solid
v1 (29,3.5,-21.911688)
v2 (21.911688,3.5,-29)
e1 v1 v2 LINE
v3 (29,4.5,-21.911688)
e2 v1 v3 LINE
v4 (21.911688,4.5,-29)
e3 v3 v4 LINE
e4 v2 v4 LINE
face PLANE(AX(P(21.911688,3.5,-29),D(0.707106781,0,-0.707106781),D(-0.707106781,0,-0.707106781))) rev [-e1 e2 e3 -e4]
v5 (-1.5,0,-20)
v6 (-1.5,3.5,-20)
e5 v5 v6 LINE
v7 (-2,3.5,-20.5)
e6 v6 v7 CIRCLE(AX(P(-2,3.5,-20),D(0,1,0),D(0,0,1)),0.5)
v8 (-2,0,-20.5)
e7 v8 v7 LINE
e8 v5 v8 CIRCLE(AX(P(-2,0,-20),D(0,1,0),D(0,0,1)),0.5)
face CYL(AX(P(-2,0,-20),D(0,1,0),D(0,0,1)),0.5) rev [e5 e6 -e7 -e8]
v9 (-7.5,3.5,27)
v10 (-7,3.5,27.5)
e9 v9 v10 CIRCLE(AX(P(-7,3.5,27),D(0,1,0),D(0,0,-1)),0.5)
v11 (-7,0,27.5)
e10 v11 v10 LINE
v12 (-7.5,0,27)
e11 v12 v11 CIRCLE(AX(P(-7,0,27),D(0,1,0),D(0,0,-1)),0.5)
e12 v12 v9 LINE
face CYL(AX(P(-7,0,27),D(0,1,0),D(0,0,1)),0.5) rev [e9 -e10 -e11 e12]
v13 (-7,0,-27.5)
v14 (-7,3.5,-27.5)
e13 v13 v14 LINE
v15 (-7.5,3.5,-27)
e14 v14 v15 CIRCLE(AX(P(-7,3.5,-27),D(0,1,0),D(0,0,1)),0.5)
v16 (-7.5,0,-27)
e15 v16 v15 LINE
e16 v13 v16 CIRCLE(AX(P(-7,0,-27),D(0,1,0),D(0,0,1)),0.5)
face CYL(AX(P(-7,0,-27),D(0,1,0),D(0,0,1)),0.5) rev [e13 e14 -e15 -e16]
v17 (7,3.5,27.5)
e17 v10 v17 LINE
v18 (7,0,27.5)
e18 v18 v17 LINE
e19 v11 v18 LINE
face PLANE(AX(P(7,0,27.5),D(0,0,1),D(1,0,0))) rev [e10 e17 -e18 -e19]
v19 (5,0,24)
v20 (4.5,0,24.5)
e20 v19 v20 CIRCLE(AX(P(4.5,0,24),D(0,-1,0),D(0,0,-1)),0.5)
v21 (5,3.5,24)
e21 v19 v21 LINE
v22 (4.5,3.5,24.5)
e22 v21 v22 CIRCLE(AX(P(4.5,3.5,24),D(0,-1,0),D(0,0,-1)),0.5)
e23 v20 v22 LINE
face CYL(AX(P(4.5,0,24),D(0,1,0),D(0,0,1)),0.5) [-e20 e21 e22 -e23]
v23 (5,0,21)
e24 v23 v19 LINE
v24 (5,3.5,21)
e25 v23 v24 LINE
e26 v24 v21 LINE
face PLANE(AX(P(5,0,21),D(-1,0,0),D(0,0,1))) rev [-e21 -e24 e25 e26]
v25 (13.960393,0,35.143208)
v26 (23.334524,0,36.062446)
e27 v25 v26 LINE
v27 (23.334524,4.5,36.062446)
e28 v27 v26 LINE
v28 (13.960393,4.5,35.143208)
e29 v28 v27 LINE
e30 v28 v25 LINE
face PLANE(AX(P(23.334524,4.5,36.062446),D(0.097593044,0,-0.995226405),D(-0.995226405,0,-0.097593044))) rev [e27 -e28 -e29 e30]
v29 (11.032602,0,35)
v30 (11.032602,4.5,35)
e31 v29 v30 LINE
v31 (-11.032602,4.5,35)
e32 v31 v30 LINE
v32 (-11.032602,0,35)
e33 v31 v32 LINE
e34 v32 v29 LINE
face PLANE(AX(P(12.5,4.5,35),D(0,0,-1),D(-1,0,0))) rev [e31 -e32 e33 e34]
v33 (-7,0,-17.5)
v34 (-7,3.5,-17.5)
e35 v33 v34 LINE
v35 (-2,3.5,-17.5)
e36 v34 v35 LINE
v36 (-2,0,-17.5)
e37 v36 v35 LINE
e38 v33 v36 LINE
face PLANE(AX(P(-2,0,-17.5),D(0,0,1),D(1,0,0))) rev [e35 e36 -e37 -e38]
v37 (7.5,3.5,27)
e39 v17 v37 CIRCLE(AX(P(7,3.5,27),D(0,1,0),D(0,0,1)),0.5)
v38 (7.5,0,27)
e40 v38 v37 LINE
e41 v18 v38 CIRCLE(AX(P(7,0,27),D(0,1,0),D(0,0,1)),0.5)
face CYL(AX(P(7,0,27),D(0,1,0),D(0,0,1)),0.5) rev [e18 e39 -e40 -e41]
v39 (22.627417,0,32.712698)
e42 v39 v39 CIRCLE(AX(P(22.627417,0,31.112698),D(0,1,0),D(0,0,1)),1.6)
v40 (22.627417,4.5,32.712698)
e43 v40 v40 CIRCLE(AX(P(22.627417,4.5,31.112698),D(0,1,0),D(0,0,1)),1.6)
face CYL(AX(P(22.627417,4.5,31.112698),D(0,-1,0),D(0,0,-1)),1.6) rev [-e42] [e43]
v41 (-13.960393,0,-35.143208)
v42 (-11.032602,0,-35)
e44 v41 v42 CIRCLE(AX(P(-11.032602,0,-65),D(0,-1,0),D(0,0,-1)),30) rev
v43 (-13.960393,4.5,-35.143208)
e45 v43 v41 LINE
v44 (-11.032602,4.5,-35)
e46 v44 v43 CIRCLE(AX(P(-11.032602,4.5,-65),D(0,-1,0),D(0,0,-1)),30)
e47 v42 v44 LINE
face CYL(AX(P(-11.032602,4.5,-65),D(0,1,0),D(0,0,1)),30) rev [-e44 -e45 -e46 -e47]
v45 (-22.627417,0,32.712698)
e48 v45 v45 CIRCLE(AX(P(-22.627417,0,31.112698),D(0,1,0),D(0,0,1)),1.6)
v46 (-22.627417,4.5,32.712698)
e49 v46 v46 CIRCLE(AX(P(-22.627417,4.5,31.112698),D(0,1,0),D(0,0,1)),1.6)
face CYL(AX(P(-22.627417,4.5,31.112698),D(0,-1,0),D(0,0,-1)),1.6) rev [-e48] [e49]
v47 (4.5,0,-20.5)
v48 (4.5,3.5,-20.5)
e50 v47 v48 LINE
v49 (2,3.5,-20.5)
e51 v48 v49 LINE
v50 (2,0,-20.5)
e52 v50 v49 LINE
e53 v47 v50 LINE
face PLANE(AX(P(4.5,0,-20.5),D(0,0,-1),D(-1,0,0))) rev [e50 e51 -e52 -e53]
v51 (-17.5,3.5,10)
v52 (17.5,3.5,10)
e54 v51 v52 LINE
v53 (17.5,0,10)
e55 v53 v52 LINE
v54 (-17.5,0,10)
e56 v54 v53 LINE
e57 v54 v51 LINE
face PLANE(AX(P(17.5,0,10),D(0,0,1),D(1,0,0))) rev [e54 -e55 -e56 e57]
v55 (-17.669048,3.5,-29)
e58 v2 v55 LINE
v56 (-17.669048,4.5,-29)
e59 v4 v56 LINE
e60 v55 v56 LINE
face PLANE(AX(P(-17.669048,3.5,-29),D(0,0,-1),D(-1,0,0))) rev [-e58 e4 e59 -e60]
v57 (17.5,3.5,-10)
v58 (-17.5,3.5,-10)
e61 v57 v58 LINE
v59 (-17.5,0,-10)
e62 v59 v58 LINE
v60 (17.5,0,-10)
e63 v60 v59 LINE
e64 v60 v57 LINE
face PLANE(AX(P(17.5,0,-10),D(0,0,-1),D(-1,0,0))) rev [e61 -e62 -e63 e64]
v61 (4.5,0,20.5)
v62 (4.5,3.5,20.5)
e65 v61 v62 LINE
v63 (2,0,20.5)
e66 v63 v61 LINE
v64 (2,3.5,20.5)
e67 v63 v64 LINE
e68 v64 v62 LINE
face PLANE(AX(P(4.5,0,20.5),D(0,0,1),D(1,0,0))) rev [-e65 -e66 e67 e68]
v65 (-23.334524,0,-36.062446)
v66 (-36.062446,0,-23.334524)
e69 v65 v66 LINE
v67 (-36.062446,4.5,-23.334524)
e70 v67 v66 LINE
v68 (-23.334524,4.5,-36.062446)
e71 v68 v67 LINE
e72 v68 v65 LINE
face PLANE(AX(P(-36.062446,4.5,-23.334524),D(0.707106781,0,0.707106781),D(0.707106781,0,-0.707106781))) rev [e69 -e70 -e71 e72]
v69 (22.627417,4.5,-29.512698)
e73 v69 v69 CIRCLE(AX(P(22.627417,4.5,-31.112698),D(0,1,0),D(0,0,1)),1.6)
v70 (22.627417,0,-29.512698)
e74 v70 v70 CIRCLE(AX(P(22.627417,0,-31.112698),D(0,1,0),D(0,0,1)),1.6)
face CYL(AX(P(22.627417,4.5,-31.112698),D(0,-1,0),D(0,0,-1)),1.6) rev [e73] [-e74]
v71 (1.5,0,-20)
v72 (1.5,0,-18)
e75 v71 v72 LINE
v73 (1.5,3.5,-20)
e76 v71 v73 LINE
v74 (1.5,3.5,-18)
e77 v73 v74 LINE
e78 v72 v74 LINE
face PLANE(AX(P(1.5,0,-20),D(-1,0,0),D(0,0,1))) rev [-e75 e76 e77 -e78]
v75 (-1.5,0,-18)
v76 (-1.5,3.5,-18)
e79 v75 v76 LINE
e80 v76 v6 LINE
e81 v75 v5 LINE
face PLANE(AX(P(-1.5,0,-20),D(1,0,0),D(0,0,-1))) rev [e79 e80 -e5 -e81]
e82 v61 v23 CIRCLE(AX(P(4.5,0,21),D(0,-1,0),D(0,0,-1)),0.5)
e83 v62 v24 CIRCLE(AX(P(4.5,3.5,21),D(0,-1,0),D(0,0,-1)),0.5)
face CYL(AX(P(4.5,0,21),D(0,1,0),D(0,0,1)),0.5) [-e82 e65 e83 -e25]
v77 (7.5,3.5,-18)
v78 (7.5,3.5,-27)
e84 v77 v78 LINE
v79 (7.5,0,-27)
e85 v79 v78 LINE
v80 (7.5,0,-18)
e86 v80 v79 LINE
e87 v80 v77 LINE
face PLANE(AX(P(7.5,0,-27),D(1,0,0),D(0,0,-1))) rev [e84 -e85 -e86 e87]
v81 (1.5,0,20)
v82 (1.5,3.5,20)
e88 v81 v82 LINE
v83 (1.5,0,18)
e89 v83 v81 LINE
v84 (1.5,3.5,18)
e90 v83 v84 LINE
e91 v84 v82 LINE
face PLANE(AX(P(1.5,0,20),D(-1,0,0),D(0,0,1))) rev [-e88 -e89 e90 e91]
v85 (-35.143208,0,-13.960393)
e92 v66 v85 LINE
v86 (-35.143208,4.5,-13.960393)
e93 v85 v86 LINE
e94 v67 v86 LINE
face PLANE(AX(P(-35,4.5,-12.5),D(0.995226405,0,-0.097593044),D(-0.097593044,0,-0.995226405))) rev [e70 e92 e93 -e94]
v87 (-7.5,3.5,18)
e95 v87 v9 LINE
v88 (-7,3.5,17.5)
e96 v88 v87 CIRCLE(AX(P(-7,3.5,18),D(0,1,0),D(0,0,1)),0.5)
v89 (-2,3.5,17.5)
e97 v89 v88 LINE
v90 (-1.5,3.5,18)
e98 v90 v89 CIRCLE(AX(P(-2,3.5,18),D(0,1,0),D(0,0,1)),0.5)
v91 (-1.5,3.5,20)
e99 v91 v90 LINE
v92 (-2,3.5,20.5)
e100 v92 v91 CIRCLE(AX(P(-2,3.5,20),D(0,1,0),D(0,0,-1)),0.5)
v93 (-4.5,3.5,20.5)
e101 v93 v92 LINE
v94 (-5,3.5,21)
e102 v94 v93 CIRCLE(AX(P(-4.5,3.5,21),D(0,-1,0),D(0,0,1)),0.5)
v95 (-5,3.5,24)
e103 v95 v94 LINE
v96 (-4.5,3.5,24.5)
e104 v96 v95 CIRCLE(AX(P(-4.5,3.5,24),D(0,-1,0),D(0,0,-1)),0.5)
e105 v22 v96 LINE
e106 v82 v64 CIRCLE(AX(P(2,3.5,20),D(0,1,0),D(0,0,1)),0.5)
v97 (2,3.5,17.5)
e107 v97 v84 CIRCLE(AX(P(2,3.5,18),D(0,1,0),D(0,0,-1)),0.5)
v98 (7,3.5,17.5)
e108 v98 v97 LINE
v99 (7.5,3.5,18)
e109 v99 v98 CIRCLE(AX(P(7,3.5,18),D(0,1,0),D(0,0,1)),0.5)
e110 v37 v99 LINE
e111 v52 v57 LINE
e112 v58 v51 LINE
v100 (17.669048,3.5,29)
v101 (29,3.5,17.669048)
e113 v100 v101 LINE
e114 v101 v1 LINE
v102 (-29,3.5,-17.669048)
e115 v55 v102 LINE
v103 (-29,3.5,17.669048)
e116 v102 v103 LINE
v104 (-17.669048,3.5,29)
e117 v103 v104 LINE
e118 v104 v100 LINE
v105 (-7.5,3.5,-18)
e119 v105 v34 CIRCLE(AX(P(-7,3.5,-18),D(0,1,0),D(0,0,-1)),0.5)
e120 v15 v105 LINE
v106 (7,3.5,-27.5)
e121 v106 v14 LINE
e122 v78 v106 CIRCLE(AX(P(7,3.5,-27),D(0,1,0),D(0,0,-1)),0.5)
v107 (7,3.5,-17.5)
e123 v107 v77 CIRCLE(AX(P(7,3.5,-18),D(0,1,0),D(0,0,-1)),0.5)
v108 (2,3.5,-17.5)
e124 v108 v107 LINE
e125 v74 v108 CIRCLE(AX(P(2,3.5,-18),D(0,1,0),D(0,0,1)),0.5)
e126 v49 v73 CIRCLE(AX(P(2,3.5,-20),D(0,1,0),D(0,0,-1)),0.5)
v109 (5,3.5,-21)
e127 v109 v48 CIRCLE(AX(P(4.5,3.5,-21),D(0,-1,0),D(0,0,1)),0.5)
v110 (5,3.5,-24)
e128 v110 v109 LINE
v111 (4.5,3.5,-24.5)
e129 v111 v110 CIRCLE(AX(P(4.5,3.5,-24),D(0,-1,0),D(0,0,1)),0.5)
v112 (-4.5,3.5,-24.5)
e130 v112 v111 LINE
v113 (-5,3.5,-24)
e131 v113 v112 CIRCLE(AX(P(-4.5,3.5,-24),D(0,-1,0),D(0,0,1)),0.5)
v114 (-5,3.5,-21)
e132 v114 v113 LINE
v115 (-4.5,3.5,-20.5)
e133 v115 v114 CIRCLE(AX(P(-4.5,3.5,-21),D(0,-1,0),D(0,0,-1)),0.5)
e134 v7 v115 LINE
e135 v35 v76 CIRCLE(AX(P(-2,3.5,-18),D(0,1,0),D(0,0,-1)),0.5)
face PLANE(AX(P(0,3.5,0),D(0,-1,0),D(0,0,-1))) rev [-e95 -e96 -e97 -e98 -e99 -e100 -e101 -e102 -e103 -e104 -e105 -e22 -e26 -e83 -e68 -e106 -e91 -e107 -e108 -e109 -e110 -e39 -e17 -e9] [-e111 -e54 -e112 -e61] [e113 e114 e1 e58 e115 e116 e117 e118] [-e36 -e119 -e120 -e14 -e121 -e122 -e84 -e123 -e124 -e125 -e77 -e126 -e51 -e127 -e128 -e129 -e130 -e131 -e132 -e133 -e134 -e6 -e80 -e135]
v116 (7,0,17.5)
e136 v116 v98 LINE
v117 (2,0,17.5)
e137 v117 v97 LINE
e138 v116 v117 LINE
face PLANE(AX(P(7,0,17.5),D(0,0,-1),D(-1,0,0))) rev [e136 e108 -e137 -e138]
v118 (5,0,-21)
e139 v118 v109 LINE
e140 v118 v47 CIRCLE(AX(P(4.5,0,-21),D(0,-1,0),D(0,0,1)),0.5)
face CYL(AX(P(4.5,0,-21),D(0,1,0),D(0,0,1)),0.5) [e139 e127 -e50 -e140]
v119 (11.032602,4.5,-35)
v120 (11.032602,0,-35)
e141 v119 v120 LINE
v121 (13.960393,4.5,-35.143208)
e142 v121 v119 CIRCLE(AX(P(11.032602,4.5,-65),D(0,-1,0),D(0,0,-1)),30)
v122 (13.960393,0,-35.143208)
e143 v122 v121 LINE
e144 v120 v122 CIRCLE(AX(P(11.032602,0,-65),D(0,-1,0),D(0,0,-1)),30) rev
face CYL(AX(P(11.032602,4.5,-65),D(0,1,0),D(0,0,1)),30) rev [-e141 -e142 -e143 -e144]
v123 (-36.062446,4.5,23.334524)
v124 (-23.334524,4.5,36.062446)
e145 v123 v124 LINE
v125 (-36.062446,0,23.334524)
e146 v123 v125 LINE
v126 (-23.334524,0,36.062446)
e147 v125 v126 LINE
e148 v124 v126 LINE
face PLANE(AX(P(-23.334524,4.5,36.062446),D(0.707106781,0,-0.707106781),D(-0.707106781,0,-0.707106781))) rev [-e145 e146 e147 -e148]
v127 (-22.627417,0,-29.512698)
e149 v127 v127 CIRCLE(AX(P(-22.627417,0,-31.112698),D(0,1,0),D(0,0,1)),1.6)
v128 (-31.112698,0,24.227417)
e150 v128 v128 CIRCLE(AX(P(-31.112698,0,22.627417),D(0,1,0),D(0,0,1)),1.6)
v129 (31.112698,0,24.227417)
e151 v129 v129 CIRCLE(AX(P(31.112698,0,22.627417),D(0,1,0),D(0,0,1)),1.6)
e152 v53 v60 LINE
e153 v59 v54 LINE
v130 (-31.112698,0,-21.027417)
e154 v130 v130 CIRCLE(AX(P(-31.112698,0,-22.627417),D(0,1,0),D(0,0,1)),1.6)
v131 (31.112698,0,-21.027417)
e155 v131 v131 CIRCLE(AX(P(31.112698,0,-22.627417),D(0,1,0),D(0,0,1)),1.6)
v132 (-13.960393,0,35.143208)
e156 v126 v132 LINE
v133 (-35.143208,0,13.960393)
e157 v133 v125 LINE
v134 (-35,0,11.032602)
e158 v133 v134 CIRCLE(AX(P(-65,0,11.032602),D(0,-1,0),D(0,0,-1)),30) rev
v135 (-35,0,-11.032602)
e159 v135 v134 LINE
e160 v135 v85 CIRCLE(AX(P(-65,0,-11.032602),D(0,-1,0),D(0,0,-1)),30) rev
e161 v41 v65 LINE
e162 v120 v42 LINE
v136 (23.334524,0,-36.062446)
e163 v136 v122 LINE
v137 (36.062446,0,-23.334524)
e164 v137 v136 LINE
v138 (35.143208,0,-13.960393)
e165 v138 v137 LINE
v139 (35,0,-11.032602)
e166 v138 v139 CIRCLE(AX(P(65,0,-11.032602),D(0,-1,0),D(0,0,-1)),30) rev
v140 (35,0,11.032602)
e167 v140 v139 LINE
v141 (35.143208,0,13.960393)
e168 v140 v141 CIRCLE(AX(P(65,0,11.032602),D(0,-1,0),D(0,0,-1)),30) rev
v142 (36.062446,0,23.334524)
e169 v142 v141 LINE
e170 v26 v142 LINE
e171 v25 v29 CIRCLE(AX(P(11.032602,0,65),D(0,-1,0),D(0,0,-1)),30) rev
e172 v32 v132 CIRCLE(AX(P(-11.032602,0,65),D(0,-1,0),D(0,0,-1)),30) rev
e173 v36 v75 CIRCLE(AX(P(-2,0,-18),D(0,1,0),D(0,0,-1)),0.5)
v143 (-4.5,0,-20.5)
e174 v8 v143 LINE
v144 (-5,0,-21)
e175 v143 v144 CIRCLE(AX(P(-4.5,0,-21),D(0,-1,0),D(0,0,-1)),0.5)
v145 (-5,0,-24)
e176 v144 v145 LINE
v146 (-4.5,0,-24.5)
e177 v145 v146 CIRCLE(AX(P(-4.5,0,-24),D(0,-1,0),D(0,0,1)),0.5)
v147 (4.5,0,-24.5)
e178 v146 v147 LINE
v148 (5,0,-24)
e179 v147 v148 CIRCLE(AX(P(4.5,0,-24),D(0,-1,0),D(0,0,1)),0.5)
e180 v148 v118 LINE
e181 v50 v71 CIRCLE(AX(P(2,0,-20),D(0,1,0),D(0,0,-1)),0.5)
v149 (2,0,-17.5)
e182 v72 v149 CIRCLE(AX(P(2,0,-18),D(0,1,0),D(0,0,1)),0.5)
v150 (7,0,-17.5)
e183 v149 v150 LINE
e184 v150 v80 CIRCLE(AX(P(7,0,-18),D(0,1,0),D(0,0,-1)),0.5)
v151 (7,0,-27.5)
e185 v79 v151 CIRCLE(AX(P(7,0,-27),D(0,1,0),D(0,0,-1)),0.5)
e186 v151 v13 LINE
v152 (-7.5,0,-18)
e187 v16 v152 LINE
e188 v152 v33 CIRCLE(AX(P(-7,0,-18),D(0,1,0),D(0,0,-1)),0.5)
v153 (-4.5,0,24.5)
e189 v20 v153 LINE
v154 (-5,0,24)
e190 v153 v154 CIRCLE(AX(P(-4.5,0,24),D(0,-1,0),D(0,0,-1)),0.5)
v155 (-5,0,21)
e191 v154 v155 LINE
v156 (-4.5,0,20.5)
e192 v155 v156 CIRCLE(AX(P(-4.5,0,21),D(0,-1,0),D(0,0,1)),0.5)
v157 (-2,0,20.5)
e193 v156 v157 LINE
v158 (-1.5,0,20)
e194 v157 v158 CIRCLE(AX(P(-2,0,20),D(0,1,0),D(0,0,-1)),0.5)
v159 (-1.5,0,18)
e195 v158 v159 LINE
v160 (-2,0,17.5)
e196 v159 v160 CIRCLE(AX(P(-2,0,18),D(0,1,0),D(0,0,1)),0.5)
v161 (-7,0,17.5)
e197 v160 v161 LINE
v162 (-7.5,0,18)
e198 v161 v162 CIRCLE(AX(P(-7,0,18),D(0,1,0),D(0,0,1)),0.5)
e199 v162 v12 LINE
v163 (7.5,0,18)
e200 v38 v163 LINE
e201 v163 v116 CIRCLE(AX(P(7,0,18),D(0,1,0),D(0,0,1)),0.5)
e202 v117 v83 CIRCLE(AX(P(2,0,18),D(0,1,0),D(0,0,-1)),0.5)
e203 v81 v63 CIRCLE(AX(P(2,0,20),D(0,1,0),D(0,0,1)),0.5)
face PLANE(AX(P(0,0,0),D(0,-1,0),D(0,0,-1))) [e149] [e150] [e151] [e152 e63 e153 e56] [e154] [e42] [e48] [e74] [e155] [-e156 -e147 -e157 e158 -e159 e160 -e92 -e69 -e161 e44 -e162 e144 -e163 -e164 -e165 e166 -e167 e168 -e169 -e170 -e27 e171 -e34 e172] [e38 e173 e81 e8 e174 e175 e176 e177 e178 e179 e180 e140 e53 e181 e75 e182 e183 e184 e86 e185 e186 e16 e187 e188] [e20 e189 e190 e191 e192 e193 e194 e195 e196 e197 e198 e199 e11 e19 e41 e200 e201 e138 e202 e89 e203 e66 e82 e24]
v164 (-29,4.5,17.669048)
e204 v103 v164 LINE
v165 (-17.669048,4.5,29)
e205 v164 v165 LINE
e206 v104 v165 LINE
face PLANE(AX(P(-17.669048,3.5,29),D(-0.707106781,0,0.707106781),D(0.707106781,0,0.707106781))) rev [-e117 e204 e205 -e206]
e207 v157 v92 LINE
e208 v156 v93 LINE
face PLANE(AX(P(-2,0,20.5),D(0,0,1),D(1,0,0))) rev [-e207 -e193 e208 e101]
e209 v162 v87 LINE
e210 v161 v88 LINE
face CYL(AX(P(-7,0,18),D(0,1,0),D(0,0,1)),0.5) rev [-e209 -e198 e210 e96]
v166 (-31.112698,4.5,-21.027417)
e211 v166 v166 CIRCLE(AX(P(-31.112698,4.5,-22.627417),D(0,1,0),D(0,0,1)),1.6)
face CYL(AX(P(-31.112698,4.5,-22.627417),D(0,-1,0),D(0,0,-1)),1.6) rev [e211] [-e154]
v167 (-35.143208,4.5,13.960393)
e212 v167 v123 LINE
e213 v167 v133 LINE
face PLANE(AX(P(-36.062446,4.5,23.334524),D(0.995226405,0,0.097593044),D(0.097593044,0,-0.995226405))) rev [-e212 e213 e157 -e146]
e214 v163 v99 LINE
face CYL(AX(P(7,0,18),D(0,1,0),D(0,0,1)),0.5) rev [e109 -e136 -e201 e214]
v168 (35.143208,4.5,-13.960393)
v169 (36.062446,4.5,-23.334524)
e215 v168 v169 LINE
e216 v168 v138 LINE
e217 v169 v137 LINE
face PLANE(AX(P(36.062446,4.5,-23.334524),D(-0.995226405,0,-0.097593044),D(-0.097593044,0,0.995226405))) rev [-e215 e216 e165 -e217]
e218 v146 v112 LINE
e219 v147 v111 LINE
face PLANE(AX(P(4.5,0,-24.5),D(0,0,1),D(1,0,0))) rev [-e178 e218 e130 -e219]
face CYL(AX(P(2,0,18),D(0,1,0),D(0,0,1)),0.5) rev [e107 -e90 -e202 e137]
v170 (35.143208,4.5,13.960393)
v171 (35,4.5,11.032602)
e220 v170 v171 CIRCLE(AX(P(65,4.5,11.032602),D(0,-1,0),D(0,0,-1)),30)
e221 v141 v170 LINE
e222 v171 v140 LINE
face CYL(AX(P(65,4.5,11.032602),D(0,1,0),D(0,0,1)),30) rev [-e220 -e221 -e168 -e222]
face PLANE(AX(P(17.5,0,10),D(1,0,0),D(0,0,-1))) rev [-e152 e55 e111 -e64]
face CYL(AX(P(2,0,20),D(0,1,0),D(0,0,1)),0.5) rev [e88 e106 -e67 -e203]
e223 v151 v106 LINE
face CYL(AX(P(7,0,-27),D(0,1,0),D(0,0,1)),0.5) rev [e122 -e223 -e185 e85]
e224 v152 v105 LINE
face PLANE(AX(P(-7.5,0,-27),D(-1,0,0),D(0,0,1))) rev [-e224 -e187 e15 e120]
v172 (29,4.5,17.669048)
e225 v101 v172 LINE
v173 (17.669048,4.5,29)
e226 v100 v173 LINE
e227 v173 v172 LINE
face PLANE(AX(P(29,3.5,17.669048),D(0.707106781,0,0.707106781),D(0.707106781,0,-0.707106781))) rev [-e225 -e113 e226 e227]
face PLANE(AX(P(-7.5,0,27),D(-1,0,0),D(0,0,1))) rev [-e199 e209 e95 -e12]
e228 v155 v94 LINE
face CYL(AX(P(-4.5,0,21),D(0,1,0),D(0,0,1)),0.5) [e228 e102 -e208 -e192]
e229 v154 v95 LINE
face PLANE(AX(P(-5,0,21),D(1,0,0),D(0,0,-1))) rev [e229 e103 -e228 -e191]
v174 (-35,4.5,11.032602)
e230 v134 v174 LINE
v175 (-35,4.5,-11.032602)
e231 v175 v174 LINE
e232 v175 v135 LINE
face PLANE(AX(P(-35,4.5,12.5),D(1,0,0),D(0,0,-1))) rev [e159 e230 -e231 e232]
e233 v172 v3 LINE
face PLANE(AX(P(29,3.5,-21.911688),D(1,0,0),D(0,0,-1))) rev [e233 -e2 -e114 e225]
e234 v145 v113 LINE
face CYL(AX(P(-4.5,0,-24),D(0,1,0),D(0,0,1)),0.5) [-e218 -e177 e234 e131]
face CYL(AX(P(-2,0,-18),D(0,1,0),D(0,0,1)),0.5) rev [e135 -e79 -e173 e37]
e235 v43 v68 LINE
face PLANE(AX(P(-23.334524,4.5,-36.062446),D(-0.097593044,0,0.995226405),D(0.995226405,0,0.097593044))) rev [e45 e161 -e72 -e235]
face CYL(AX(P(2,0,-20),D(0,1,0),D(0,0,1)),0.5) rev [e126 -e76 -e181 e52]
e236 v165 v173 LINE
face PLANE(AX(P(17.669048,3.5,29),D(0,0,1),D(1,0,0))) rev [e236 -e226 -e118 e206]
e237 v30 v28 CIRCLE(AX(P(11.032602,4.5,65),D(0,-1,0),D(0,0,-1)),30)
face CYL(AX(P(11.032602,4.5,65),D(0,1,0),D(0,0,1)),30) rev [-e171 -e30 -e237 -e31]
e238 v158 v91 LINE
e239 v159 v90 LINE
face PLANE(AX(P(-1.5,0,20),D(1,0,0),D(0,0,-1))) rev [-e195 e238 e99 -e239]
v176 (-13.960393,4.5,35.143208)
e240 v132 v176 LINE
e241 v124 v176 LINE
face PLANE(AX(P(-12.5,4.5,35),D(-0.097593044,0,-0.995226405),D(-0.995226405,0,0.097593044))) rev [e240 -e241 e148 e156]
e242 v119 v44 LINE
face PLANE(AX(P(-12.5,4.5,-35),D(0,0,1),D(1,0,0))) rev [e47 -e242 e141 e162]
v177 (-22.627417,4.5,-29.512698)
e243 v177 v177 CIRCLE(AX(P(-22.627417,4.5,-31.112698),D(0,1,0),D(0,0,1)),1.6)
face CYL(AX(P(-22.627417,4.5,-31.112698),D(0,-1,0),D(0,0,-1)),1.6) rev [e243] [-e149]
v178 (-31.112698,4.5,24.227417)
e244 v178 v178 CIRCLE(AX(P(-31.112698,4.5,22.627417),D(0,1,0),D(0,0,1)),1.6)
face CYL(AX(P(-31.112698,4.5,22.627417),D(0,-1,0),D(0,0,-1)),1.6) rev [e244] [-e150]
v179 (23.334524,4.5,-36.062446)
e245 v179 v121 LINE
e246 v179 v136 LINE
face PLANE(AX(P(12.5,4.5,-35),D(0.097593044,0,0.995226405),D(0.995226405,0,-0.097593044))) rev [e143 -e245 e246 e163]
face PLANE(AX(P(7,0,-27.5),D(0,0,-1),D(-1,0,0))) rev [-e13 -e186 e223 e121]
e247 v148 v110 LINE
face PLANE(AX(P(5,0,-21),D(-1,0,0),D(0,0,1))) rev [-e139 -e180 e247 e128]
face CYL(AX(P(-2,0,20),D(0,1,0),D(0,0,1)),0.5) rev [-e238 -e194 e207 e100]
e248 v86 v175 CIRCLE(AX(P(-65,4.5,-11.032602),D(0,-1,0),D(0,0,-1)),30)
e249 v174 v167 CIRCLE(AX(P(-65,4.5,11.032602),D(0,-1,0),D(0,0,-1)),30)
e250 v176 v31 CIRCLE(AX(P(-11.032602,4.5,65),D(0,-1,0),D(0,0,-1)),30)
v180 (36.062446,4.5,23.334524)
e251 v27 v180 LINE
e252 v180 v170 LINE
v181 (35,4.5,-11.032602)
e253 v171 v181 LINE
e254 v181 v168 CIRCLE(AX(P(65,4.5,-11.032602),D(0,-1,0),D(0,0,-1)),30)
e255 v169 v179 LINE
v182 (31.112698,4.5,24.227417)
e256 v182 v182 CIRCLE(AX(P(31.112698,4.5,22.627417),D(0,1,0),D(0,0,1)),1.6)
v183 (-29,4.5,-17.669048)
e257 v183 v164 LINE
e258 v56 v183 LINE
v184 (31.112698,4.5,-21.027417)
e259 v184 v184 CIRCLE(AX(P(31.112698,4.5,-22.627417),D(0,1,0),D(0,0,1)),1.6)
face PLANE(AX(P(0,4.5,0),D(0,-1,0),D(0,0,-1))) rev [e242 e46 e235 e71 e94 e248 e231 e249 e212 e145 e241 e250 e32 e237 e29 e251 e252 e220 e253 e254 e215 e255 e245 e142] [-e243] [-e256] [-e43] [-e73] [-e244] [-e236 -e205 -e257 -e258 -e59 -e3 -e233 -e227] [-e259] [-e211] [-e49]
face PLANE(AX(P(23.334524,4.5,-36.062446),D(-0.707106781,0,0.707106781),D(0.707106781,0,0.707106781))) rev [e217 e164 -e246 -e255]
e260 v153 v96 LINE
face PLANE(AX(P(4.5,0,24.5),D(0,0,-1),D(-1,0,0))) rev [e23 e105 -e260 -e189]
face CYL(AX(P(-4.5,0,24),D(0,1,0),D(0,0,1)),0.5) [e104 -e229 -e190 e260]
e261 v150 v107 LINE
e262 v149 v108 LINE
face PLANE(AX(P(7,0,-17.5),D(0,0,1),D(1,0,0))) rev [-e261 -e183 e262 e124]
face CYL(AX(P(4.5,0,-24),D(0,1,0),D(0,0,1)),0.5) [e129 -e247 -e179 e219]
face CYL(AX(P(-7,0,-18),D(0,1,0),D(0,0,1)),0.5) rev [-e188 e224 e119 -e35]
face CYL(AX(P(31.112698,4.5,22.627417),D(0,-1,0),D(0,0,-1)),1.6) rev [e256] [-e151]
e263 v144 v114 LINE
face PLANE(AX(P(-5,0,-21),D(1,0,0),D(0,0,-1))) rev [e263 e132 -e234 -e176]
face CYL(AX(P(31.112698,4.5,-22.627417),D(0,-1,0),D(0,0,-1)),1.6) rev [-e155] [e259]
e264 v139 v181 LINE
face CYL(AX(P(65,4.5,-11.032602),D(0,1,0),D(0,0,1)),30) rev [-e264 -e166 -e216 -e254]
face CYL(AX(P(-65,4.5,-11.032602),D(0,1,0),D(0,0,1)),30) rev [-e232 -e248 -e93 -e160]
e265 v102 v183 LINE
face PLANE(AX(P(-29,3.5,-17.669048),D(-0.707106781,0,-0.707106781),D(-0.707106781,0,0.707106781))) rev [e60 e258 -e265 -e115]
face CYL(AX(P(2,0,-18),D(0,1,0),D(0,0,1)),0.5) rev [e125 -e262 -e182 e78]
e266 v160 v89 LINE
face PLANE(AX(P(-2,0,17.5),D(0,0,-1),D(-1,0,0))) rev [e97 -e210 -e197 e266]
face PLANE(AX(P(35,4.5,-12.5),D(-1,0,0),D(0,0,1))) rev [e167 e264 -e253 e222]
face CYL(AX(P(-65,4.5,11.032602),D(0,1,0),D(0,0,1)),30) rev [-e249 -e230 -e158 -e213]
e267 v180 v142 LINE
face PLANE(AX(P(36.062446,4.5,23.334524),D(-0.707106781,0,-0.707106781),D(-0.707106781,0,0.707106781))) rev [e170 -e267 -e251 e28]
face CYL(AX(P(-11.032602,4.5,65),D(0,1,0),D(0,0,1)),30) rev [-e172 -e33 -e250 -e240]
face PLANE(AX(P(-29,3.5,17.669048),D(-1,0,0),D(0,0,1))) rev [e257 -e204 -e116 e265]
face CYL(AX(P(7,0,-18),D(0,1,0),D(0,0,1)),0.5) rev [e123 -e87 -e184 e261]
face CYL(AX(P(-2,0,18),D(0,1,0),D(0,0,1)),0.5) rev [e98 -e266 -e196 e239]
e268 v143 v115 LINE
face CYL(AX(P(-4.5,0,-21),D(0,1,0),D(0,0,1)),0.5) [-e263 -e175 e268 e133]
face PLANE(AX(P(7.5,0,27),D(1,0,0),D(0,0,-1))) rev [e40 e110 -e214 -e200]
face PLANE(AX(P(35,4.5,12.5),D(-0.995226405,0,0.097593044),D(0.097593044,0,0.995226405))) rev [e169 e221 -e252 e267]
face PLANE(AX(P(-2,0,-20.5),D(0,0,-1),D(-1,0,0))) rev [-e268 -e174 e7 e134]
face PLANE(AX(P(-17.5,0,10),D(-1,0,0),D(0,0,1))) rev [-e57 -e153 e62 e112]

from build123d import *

# Parameters (mm, degrees)
SKETCH2_R           = 1.6
BOSS_EXTRUDE1_DEPTH = 4.5
CUT_EXTRUDE1_DEPTH  = 1
FILLET2_R           = 30
CUT_EXTRUDE4_DEPTH  = 52.119956964
SKETCH11_W          = 35
SKETCH11_H          = 20
CUT_EXTRUDE5_DEPTH  = 52.119956964


with BuildPart() as part:
    # Sketch2 → Boss-Extrude1 (new body)
    with BuildSketch(Plane(origin=(0, 0, 0), x_dir=(1, 0, 0), z_dir=(0, 1, 0))):
        Polygon((-12.5, 35), (12.5, 35), (23.334523779, 36.062445841), (36.062445841, 23.334523779), (35, 12.5), (35, -12.5), (36.062445841, -23.334523779), (23.334523779, -36.062445841), (12.5, -35), (-12.5, -35), (-23.334523779, -36.062445841), (-36.062445841, -23.334523779), (-35, -12.5), (-35, 12.5), (-36.062445841, 23.334523779), (-23.334523779, 36.062445841), align=None)
        with Locations(Location((22.627416998, 31.112698372, 0), (0, 0, 270))):
            Circle(SKETCH2_R, mode=Mode.SUBTRACT)
        with Locations(Location((31.112698372, 22.627416998, 0), (0, 0, 270))):
            Circle(SKETCH2_R, mode=Mode.SUBTRACT)
        with Locations(Location((22.627416998, -31.112698372, 0), (0, 0, 270))):
            Circle(SKETCH2_R, mode=Mode.SUBTRACT)
        with Locations(Location((31.112698372, -22.627416998, 0), (0, 0, 270))):
            Circle(SKETCH2_R, mode=Mode.SUBTRACT)
        with Locations(Location((-31.112698372, -22.627416998, 0), (0, 0, 270))):
            Circle(SKETCH2_R, mode=Mode.SUBTRACT)
        with Locations(Location((-22.627416998, -31.112698372, 0), (0, 0, 270))):
            Circle(SKETCH2_R, mode=Mode.SUBTRACT)
        with Locations(Location((-22.627416998, 31.112698372, 0), (0, 0, 270))):
            Circle(SKETCH2_R, mode=Mode.SUBTRACT)
        with Locations(Location((-31.112698372, 22.627416998, 0), (0, 0, 270))):
            Circle(SKETCH2_R, mode=Mode.SUBTRACT)
    extrude(amount=BOSS_EXTRUDE1_DEPTH)

    # Sketch3 → Cut-Extrude1 (cut)
    with BuildSketch(Plane(origin=(0, 4.5, 0), x_dir=(1, 0, 0), z_dir=(0, 1, 0))):
        Polygon((-17.669047558, 29), (21.911688245, 29), (29, 21.911688245), (29, -17.669047558), (17.669047558, -29), (-17.669047558, -29), (-29, -17.669047558), (-29, 17.669047558), align=None)
    extrude(amount=-CUT_EXTRUDE1_DEPTH, mode=Mode.SUBTRACT)

    # Fillet2
    # the kernel refuses this fillet: 30 mm, written as the material it adds along each edge
    with BuildSketch(Plane(origin=(-12.5, 0, -35), x_dir=(1, 0, 0), z_dir=(0, 1, 0))) as fillet2_piece_1:
        with BuildLine():
            CenterArc((FILLET2_R * 0.0489132680018, FILLET2_R), FILLET2_R, 264.399415997, 5.600584003)
            Line((-FILLET2_R * 0.0486797758844, FILLET2_R * 0.00477359471072), (0, 0))
            Line((0, 0), (FILLET2_R * 0.0489132680018, 0))
        make_face()
    extrude(amount=4.5)
    with BuildSketch(Plane(origin=(12.5, 0, -35), x_dir=(-1, 0, 0), z_dir=(0, 1, 0)), Plane(origin=(35, 0, -12.5), x_dir=(0.09759304388620155, 0, -0.9952264052892819), z_dir=(0, 1, 0)), Plane(origin=(35, 0, 12.5), x_dir=(0, 0, -1), z_dir=(0, 1, 0)), Plane(origin=(12.5, 0, 35), x_dir=(0.9952264052892817, 0, 0.09759304388620309), z_dir=(0, 1, 0)), Plane(origin=(-12.5, 0, 35), x_dir=(1, 0, 0), z_dir=(0, 1, 0)), Plane(origin=(-35, 0, 12.5), x_dir=(-0.09759304388619769, 0, 0.9952264052892822), z_dir=(0, 1, 0)), Plane(origin=(-35, 0, -12.5), x_dir=(0, 0, 1), z_dir=(0, 1, 0))) as fillet2_piece_2:
        with BuildLine():
            CenterArc((FILLET2_R * 0.048913268002, -FILLET2_R), FILLET2_R, 90, 5.600584003)
            Line((-FILLET2_R * 0.0486797758846, -FILLET2_R * 0.00477359471075), (0, 0))
            Line((0, 0), (FILLET2_R * 0.048913268002, 0))
        make_face()
    extrude(amount=4.5)

    # Sketch10 → Cut-Extrude4 (cut, through all)
    with BuildSketch(Plane(origin=(0, 3.5, 0), x_dir=(1, 0, 0), z_dir=(0, 1, 0))):
        with BuildLine():
            Line((-1.5, 20), (-1.5, 18))
            ThreePointArc((-1.5, 18), (-1.646446609, 17.646446609), (-2, 17.5))
            Line((-2, 17.5), (-7, 17.5))
            ThreePointArc((-7, 17.5), (-7.353553391, 17.646446609), (-7.5, 18))
            Line((-7.5, 18), (-7.5, 27))
            ThreePointArc((-7.5, 27), (-7.353553391, 27.353553391), (-7, 27.5))
            Line((-7, 27.5), (7, 27.5))
            ThreePointArc((7, 27.5), (7.353553391, 27.353553391), (7.5, 27))
            Line((7.5, 27), (7.5, 18))
            ThreePointArc((7.5, 18), (7.353553391, 17.646446609), (7, 17.5))
            Line((7, 17.5), (2, 17.5))
            ThreePointArc((2, 17.5), (1.646446609, 17.646446609), (1.5, 18))
            Line((1.5, 18), (1.5, 20))
            ThreePointArc((1.5, 20), (1.646446609, 20.353553391), (2, 20.5))
            Line((2, 20.5), (4.5, 20.5))
            ThreePointArc((4.5, 20.5), (4.853553391, 20.646446609), (5, 21))
            Line((5, 21), (5, 24))
            ThreePointArc((5, 24), (4.853553391, 24.353553391), (4.5, 24.5))
            Line((4.5, 24.5), (-4.5, 24.5))
            ThreePointArc((-4.5, 24.5), (-4.853553391, 24.353553391), (-5, 24))
            Line((-5, 24), (-5, 21))
            ThreePointArc((-5, 21), (-4.853553391, 20.646446609), (-4.5, 20.5))
            Line((-4.5, 20.5), (-2, 20.5))
            ThreePointArc((-2, 20.5), (-1.646446609, 20.353553391), (-1.5, 20))
        make_face()
        with BuildLine():
            Line((-2, -20.5), (-4.5, -20.5))
            ThreePointArc((-4.5, -20.5), (-4.853553391, -20.646446609), (-5, -21))
            Line((-5, -21), (-5, -24))
            ThreePointArc((-5, -24), (-4.853553391, -24.353553391), (-4.5, -24.5))
            Line((-4.5, -24.5), (4.5, -24.5))
            ThreePointArc((4.5, -24.5), (4.853553391, -24.353553391), (5, -24))
            Line((5, -24), (5, -21))
            ThreePointArc((5, -21), (4.853553391, -20.646446609), (4.5, -20.5))
            Line((4.5, -20.5), (2, -20.5))
            ThreePointArc((2, -20.5), (1.646446609, -20.353553391), (1.5, -20))
            Line((1.5, -20), (1.5, -18))
            ThreePointArc((1.5, -18), (1.646446609, -17.646446609), (2, -17.5))
            Line((2, -17.5), (7, -17.5))
            ThreePointArc((7, -17.5), (7.353553391, -17.646446609), (7.5, -18))
            Line((7.5, -18), (7.5, -27))
            ThreePointArc((7.5, -27), (7.353553391, -27.353553391), (7, -27.5))
            Line((7, -27.5), (-7, -27.5))
            ThreePointArc((-7, -27.5), (-7.353553391, -27.353553391), (-7.5, -27))
            Line((-7.5, -27), (-7.5, -18))
            ThreePointArc((-7.5, -18), (-7.353553391, -17.646446609), (-7, -17.5))
            Line((-7, -17.5), (-2, -17.5))
            ThreePointArc((-2, -17.5), (-1.646446609, -17.646446609), (-1.5, -18))
            Line((-1.5, -18), (-1.5, -20))
            ThreePointArc((-1.5, -20), (-1.646446609, -20.353553391), (-2, -20.5))
        make_face()
    extrude(amount=-CUT_EXTRUDE4_DEPTH, mode=Mode.SUBTRACT)

    # Sketch11 → Cut-Extrude5 (cut, through all)
    with BuildSketch(Plane(origin=(0, 3.5, 0), x_dir=(1, 0, 0), z_dir=(0, 1, 0))):
        Rectangle(SKETCH11_W, SKETCH11_H)
    extrude(amount=-CUT_EXTRUDE5_DEPTH, mode=Mode.SUBTRACT)


solid = part.part
